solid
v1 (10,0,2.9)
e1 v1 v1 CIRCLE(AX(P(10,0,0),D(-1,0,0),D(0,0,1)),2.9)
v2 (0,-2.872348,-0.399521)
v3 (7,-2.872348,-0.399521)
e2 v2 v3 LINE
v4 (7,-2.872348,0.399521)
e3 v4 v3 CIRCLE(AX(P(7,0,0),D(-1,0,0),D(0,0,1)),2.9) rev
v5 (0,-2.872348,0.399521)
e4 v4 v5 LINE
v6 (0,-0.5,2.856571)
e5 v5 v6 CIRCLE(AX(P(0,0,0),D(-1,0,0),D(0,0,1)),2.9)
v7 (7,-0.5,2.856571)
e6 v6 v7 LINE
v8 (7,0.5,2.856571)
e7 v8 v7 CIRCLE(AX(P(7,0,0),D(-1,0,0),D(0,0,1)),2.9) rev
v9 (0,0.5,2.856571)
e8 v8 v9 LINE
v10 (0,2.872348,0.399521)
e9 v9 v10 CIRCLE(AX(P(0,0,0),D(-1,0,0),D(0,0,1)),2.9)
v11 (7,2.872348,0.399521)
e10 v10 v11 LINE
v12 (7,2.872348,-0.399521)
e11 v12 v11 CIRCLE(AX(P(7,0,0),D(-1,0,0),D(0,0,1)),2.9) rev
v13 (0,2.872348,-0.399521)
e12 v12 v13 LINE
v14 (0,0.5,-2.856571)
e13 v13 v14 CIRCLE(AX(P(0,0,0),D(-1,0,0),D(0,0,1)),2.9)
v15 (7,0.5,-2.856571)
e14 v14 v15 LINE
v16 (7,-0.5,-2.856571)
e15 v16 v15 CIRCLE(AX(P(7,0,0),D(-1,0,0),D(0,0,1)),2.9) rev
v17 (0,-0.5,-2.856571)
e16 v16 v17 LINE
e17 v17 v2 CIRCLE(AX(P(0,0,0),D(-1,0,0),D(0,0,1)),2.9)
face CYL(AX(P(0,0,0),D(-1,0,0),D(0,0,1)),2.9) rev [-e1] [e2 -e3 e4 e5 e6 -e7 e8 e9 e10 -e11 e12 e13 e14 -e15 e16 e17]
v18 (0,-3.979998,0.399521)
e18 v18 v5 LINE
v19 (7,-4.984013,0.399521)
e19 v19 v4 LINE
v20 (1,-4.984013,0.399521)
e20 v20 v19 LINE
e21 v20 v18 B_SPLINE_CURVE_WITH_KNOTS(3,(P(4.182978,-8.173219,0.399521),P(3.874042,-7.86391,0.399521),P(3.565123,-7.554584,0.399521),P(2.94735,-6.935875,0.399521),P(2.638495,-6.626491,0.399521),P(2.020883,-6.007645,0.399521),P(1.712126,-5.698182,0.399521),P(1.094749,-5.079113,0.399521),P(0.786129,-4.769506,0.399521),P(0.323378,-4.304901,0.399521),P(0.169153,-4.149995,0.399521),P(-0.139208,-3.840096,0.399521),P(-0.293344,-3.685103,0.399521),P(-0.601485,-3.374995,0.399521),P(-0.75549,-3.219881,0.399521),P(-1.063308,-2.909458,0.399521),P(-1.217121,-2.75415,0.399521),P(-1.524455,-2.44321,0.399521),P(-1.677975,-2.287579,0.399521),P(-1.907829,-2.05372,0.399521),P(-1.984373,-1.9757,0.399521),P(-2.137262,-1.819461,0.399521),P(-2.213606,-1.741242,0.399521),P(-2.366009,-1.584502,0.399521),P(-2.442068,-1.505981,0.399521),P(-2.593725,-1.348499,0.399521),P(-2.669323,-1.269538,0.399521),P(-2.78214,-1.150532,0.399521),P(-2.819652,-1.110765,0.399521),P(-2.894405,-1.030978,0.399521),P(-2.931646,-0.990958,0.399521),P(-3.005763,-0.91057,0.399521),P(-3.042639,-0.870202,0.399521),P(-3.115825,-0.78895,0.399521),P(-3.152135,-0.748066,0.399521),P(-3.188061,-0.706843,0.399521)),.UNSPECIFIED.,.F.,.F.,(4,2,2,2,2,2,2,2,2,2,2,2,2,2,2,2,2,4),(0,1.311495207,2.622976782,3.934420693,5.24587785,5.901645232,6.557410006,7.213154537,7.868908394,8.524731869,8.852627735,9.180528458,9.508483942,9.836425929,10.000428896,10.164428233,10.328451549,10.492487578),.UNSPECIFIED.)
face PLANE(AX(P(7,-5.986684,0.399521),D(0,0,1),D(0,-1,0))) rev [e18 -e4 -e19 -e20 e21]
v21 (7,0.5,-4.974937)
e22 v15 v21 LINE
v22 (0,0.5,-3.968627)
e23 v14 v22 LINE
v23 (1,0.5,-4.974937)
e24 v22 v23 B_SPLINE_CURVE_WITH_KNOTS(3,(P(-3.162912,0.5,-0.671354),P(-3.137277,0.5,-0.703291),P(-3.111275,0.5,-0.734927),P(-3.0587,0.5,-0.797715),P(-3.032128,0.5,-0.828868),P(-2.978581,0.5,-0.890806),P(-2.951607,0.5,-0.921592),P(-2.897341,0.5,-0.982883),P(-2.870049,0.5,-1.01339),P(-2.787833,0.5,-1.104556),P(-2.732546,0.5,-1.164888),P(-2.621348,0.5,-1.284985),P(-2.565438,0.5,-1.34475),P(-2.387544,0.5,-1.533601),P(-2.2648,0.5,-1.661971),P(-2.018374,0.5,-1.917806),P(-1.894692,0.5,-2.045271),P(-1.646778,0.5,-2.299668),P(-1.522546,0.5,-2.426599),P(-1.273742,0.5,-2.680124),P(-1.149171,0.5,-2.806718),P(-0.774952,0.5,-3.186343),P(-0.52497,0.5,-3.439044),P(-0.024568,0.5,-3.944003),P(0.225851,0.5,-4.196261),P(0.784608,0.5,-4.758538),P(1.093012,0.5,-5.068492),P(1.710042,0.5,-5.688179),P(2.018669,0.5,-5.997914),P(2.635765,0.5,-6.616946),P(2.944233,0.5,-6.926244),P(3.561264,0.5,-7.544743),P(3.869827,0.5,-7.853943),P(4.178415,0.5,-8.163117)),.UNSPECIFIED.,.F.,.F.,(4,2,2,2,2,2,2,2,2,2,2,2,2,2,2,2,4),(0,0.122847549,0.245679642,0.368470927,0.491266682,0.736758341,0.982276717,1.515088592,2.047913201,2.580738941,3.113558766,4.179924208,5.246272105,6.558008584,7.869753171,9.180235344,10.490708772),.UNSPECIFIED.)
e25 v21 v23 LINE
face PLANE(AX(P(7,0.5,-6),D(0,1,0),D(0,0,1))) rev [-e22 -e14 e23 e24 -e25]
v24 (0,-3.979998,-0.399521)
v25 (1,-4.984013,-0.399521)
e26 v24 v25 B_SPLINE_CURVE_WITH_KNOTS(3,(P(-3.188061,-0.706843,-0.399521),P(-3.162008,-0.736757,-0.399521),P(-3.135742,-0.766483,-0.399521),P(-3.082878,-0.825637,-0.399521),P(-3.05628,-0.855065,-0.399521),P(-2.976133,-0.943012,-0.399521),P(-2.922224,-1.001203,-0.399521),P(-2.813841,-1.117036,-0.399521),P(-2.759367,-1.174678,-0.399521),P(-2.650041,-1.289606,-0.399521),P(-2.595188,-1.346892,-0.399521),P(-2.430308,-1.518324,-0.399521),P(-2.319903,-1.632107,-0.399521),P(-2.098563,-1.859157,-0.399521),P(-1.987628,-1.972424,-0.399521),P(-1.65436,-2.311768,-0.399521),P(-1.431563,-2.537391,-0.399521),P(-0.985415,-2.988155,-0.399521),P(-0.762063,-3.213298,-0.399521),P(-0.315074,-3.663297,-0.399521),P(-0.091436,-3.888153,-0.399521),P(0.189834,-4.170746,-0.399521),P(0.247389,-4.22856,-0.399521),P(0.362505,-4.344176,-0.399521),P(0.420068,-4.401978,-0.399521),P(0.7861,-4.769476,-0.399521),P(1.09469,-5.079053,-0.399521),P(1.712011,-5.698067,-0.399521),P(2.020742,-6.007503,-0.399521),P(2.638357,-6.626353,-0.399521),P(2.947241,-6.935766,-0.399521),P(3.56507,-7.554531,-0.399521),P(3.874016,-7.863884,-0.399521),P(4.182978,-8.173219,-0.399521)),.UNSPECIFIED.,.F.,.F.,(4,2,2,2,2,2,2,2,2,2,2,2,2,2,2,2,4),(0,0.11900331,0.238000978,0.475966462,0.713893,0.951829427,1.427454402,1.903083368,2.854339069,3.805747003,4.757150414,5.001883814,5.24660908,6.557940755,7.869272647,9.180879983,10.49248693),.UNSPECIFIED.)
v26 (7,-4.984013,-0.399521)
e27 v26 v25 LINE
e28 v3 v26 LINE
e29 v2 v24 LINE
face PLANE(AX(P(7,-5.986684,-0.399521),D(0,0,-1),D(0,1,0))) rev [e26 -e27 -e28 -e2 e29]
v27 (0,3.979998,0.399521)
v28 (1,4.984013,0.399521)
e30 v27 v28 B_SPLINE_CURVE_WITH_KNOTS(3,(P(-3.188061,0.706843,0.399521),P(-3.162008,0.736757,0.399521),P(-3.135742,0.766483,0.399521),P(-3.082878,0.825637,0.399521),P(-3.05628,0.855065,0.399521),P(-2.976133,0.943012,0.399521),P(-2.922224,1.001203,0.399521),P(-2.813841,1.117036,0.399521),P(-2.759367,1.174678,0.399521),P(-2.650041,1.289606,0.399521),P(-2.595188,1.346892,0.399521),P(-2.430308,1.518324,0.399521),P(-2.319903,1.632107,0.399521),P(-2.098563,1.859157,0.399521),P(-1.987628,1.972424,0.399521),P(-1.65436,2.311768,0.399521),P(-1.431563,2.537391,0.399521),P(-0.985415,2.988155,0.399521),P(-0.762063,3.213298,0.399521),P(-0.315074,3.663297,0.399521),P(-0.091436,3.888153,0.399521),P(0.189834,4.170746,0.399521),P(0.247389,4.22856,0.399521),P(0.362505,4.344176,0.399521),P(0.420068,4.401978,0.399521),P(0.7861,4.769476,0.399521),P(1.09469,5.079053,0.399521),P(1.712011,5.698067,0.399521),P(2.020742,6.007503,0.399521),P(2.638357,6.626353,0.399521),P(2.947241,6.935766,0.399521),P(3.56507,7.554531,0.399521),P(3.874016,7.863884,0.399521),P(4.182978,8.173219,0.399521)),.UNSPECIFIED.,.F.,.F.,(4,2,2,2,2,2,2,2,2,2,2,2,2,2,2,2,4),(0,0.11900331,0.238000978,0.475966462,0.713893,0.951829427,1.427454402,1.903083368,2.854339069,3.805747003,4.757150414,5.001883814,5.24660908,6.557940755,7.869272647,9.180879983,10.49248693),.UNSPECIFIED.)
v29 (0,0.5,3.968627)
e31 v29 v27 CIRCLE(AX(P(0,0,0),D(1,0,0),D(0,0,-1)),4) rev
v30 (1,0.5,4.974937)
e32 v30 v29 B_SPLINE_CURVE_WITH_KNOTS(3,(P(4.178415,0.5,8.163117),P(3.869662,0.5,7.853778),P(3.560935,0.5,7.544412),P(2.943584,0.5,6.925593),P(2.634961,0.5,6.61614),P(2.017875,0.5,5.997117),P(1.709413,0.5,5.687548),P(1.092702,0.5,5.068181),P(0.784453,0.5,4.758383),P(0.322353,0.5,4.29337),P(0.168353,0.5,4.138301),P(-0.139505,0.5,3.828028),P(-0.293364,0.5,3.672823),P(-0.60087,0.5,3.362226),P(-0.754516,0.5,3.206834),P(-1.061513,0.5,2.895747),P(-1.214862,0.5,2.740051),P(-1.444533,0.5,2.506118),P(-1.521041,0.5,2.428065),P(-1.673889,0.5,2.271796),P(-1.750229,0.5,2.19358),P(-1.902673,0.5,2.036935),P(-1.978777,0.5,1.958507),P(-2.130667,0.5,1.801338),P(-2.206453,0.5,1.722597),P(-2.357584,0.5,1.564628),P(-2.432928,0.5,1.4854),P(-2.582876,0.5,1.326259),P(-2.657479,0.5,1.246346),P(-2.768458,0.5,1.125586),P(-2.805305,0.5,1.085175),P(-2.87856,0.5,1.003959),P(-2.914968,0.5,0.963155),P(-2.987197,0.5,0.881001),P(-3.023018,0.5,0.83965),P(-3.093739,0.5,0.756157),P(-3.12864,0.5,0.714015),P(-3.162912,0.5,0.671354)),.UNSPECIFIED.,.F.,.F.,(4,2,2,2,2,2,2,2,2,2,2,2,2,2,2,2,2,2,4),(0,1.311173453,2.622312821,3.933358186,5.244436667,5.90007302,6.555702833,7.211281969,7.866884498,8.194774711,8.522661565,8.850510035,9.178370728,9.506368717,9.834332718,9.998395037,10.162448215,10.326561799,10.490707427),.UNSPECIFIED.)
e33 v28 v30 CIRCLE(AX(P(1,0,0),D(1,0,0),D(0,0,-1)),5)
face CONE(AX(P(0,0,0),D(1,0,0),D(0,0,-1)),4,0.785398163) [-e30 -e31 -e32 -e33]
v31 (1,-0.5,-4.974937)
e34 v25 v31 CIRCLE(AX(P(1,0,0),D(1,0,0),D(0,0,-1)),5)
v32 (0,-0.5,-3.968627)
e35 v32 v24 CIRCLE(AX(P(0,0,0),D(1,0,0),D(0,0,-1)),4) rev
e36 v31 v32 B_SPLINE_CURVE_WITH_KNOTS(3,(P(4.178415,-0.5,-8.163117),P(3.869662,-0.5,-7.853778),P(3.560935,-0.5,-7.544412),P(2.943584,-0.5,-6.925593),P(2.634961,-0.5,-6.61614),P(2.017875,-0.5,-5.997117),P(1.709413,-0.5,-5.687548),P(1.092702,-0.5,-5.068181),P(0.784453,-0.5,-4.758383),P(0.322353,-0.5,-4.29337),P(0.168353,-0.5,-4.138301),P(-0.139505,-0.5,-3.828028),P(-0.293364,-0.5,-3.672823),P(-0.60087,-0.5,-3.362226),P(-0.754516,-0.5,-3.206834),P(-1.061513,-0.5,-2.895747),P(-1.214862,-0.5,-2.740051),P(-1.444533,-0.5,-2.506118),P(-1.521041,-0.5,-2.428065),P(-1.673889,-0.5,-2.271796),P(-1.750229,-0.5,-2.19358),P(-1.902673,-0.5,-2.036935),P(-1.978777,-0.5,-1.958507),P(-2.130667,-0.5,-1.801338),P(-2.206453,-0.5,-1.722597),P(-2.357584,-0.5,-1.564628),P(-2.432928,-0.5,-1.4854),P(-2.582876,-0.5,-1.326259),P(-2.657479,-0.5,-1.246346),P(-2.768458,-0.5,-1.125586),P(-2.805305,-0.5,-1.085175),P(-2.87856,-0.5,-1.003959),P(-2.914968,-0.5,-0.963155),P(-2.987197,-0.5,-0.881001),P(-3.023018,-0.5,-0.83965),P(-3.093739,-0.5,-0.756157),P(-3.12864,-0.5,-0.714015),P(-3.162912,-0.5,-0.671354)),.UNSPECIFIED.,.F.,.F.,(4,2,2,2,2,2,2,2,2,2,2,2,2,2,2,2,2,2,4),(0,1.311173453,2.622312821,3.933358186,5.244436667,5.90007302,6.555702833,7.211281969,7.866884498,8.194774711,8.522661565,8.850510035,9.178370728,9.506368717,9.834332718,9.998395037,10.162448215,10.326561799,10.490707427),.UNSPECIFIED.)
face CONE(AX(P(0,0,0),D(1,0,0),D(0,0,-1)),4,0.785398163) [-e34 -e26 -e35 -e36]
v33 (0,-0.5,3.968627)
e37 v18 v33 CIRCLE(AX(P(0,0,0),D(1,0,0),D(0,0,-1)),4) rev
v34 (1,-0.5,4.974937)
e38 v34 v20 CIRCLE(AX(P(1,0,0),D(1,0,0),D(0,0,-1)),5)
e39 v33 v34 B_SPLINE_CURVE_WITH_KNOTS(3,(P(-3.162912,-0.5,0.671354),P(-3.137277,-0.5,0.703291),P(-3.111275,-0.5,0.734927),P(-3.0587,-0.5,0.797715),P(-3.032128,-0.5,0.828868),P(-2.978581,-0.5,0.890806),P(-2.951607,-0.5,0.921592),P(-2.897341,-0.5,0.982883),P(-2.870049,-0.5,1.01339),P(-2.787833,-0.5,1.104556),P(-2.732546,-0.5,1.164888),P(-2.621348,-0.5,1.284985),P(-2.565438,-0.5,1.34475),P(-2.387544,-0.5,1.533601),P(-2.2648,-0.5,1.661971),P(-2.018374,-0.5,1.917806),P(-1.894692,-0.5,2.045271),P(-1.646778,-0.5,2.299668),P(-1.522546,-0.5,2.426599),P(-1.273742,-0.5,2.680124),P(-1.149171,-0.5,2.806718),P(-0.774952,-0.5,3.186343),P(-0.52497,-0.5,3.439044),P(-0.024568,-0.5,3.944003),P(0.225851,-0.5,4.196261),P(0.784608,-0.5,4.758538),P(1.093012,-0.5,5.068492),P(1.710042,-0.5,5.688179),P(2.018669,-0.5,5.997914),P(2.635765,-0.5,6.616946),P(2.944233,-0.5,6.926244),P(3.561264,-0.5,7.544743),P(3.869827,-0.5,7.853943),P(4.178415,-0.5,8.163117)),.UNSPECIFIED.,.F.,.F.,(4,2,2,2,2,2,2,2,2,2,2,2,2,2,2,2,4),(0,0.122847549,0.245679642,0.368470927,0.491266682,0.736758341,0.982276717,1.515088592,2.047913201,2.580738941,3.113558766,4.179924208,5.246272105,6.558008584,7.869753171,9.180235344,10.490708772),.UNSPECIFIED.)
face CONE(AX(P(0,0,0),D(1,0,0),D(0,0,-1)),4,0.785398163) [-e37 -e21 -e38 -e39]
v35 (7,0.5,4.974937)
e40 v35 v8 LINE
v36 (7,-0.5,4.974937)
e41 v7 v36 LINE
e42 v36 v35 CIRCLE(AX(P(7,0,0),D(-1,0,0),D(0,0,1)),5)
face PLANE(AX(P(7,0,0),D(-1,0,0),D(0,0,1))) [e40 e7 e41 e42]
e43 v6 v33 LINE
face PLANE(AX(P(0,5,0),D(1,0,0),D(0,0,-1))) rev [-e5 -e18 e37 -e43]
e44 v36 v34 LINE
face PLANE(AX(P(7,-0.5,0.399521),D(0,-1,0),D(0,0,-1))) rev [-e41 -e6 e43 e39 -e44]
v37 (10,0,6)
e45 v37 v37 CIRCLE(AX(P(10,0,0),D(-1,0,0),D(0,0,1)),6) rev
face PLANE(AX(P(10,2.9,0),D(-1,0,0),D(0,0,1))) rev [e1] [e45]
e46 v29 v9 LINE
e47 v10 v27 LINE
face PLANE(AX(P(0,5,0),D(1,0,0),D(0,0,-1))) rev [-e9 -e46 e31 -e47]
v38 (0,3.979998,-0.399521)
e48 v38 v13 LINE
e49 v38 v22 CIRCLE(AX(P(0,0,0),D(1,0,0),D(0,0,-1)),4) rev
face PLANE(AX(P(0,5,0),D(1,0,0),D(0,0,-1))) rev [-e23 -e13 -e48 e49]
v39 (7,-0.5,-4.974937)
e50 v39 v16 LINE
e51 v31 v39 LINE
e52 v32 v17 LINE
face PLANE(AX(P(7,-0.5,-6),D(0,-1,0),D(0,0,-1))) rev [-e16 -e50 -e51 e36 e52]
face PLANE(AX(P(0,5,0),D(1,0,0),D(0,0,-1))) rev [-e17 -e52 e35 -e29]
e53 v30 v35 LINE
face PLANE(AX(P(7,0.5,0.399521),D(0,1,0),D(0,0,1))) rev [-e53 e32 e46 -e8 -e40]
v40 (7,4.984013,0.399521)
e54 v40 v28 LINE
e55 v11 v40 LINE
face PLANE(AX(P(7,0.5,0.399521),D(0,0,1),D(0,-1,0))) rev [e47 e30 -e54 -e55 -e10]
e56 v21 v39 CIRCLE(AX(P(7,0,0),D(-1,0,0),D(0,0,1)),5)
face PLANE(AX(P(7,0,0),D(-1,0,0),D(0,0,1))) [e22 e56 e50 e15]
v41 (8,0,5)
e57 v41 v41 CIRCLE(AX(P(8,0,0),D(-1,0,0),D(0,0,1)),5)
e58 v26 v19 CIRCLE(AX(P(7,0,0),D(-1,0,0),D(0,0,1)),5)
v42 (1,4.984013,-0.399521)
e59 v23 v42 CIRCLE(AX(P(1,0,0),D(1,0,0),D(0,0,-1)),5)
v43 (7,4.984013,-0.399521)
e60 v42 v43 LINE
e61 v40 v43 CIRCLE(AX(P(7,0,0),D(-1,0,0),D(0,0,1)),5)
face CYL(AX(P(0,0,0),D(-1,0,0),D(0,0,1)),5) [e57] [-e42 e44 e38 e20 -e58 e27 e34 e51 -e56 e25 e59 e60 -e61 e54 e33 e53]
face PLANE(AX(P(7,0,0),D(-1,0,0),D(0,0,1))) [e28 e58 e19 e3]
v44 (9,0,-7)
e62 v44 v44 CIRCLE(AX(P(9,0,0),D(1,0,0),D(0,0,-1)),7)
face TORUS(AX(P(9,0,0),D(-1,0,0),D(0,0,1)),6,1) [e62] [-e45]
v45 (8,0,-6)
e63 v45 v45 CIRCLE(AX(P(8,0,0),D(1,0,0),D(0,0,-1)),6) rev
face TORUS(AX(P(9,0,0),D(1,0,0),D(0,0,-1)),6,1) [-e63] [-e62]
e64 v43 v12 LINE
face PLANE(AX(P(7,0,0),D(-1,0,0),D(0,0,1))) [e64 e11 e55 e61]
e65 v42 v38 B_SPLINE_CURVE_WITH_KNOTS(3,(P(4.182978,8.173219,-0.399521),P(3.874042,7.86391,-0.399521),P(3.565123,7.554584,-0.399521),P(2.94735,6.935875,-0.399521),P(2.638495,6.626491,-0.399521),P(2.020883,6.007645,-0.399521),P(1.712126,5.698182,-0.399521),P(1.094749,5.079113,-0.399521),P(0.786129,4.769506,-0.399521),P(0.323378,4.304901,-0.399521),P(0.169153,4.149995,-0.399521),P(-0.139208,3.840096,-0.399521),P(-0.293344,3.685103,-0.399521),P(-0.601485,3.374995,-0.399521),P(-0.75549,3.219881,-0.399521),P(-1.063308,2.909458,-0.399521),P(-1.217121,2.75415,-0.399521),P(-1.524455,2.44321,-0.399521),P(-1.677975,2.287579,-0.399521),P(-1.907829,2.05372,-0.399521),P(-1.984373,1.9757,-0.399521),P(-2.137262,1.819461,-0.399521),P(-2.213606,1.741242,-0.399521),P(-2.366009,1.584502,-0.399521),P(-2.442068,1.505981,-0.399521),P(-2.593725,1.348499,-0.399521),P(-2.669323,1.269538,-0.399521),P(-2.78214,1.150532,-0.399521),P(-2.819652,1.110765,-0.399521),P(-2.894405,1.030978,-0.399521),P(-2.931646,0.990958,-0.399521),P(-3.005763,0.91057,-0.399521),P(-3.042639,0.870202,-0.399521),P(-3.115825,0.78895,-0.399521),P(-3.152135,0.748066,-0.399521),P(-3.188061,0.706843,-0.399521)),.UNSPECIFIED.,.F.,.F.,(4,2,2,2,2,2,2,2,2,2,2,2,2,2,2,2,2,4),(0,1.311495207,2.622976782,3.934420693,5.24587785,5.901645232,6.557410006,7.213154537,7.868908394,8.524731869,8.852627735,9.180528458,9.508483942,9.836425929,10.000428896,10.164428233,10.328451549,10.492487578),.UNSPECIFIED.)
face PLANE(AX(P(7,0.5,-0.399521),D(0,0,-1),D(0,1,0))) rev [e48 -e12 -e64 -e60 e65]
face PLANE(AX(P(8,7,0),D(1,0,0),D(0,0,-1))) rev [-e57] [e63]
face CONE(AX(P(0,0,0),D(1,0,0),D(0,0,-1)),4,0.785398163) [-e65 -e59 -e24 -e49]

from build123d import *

# Parameters (mm, degrees)
CHAMFER_1_SIZE      = 1
FILLET_1_R          = 1
CUT_EXTRUDE_1_DEPTH = 7


with BuildPart() as part:
    # Эскиз1 → Повернуть1 (revolve)
    with BuildSketch(Plane.XY, mode=Mode.PRIVATE) as revolve_1_sk:
        Polygon((10, 2.9), (10, 7), (8, 7), (8, 5), (0, 5), (0, 2.9), align=None)
    revolve(revolve_1_sk.sketch.rotate(Axis((0, 0, 0), (1, 0, 0)), 90), axis=Axis((0, 0, 0), (1, 0, 0)))

    # Фаска1
    chamfer_1_edges = [part.edges().sort_by_distance(p)[0] for p in [
        (0, 0, -5),
    ]]
    chamfer(chamfer_1_edges, length=CHAMFER_1_SIZE)

    # Скругление1
    fillet_1_edges = [part.edges().sort_by_distance(p)[0] for p in [
        (10, 0, -7),
        (8, 0, -7),
    ]]
    fillet(fillet_1_edges, radius=FILLET_1_R - 0.0001)  # a hair under: the kernel refuses the full size

    # Эскиз2 → Вырез-Вытянуть1 (cut)
    with BuildSketch(Plane.ZY):
        Polygon((-6, -0.5), (-0.399521329, -0.5), (-0.399521329, -5.986683782), (0.399521329, -5.986683782), (0.399521329, -0.5), (6, -0.5), (6, 0.5), (0.399521329, 0.5), (0.399521329, 5.986683782), (-0.399521329, 5.986683782), (-0.399521329, 0.5), (-6, 0.5), align=None)
    extrude(amount=-CUT_EXTRUDE_1_DEPTH, mode=Mode.SUBTRACT)


solid = part.part
